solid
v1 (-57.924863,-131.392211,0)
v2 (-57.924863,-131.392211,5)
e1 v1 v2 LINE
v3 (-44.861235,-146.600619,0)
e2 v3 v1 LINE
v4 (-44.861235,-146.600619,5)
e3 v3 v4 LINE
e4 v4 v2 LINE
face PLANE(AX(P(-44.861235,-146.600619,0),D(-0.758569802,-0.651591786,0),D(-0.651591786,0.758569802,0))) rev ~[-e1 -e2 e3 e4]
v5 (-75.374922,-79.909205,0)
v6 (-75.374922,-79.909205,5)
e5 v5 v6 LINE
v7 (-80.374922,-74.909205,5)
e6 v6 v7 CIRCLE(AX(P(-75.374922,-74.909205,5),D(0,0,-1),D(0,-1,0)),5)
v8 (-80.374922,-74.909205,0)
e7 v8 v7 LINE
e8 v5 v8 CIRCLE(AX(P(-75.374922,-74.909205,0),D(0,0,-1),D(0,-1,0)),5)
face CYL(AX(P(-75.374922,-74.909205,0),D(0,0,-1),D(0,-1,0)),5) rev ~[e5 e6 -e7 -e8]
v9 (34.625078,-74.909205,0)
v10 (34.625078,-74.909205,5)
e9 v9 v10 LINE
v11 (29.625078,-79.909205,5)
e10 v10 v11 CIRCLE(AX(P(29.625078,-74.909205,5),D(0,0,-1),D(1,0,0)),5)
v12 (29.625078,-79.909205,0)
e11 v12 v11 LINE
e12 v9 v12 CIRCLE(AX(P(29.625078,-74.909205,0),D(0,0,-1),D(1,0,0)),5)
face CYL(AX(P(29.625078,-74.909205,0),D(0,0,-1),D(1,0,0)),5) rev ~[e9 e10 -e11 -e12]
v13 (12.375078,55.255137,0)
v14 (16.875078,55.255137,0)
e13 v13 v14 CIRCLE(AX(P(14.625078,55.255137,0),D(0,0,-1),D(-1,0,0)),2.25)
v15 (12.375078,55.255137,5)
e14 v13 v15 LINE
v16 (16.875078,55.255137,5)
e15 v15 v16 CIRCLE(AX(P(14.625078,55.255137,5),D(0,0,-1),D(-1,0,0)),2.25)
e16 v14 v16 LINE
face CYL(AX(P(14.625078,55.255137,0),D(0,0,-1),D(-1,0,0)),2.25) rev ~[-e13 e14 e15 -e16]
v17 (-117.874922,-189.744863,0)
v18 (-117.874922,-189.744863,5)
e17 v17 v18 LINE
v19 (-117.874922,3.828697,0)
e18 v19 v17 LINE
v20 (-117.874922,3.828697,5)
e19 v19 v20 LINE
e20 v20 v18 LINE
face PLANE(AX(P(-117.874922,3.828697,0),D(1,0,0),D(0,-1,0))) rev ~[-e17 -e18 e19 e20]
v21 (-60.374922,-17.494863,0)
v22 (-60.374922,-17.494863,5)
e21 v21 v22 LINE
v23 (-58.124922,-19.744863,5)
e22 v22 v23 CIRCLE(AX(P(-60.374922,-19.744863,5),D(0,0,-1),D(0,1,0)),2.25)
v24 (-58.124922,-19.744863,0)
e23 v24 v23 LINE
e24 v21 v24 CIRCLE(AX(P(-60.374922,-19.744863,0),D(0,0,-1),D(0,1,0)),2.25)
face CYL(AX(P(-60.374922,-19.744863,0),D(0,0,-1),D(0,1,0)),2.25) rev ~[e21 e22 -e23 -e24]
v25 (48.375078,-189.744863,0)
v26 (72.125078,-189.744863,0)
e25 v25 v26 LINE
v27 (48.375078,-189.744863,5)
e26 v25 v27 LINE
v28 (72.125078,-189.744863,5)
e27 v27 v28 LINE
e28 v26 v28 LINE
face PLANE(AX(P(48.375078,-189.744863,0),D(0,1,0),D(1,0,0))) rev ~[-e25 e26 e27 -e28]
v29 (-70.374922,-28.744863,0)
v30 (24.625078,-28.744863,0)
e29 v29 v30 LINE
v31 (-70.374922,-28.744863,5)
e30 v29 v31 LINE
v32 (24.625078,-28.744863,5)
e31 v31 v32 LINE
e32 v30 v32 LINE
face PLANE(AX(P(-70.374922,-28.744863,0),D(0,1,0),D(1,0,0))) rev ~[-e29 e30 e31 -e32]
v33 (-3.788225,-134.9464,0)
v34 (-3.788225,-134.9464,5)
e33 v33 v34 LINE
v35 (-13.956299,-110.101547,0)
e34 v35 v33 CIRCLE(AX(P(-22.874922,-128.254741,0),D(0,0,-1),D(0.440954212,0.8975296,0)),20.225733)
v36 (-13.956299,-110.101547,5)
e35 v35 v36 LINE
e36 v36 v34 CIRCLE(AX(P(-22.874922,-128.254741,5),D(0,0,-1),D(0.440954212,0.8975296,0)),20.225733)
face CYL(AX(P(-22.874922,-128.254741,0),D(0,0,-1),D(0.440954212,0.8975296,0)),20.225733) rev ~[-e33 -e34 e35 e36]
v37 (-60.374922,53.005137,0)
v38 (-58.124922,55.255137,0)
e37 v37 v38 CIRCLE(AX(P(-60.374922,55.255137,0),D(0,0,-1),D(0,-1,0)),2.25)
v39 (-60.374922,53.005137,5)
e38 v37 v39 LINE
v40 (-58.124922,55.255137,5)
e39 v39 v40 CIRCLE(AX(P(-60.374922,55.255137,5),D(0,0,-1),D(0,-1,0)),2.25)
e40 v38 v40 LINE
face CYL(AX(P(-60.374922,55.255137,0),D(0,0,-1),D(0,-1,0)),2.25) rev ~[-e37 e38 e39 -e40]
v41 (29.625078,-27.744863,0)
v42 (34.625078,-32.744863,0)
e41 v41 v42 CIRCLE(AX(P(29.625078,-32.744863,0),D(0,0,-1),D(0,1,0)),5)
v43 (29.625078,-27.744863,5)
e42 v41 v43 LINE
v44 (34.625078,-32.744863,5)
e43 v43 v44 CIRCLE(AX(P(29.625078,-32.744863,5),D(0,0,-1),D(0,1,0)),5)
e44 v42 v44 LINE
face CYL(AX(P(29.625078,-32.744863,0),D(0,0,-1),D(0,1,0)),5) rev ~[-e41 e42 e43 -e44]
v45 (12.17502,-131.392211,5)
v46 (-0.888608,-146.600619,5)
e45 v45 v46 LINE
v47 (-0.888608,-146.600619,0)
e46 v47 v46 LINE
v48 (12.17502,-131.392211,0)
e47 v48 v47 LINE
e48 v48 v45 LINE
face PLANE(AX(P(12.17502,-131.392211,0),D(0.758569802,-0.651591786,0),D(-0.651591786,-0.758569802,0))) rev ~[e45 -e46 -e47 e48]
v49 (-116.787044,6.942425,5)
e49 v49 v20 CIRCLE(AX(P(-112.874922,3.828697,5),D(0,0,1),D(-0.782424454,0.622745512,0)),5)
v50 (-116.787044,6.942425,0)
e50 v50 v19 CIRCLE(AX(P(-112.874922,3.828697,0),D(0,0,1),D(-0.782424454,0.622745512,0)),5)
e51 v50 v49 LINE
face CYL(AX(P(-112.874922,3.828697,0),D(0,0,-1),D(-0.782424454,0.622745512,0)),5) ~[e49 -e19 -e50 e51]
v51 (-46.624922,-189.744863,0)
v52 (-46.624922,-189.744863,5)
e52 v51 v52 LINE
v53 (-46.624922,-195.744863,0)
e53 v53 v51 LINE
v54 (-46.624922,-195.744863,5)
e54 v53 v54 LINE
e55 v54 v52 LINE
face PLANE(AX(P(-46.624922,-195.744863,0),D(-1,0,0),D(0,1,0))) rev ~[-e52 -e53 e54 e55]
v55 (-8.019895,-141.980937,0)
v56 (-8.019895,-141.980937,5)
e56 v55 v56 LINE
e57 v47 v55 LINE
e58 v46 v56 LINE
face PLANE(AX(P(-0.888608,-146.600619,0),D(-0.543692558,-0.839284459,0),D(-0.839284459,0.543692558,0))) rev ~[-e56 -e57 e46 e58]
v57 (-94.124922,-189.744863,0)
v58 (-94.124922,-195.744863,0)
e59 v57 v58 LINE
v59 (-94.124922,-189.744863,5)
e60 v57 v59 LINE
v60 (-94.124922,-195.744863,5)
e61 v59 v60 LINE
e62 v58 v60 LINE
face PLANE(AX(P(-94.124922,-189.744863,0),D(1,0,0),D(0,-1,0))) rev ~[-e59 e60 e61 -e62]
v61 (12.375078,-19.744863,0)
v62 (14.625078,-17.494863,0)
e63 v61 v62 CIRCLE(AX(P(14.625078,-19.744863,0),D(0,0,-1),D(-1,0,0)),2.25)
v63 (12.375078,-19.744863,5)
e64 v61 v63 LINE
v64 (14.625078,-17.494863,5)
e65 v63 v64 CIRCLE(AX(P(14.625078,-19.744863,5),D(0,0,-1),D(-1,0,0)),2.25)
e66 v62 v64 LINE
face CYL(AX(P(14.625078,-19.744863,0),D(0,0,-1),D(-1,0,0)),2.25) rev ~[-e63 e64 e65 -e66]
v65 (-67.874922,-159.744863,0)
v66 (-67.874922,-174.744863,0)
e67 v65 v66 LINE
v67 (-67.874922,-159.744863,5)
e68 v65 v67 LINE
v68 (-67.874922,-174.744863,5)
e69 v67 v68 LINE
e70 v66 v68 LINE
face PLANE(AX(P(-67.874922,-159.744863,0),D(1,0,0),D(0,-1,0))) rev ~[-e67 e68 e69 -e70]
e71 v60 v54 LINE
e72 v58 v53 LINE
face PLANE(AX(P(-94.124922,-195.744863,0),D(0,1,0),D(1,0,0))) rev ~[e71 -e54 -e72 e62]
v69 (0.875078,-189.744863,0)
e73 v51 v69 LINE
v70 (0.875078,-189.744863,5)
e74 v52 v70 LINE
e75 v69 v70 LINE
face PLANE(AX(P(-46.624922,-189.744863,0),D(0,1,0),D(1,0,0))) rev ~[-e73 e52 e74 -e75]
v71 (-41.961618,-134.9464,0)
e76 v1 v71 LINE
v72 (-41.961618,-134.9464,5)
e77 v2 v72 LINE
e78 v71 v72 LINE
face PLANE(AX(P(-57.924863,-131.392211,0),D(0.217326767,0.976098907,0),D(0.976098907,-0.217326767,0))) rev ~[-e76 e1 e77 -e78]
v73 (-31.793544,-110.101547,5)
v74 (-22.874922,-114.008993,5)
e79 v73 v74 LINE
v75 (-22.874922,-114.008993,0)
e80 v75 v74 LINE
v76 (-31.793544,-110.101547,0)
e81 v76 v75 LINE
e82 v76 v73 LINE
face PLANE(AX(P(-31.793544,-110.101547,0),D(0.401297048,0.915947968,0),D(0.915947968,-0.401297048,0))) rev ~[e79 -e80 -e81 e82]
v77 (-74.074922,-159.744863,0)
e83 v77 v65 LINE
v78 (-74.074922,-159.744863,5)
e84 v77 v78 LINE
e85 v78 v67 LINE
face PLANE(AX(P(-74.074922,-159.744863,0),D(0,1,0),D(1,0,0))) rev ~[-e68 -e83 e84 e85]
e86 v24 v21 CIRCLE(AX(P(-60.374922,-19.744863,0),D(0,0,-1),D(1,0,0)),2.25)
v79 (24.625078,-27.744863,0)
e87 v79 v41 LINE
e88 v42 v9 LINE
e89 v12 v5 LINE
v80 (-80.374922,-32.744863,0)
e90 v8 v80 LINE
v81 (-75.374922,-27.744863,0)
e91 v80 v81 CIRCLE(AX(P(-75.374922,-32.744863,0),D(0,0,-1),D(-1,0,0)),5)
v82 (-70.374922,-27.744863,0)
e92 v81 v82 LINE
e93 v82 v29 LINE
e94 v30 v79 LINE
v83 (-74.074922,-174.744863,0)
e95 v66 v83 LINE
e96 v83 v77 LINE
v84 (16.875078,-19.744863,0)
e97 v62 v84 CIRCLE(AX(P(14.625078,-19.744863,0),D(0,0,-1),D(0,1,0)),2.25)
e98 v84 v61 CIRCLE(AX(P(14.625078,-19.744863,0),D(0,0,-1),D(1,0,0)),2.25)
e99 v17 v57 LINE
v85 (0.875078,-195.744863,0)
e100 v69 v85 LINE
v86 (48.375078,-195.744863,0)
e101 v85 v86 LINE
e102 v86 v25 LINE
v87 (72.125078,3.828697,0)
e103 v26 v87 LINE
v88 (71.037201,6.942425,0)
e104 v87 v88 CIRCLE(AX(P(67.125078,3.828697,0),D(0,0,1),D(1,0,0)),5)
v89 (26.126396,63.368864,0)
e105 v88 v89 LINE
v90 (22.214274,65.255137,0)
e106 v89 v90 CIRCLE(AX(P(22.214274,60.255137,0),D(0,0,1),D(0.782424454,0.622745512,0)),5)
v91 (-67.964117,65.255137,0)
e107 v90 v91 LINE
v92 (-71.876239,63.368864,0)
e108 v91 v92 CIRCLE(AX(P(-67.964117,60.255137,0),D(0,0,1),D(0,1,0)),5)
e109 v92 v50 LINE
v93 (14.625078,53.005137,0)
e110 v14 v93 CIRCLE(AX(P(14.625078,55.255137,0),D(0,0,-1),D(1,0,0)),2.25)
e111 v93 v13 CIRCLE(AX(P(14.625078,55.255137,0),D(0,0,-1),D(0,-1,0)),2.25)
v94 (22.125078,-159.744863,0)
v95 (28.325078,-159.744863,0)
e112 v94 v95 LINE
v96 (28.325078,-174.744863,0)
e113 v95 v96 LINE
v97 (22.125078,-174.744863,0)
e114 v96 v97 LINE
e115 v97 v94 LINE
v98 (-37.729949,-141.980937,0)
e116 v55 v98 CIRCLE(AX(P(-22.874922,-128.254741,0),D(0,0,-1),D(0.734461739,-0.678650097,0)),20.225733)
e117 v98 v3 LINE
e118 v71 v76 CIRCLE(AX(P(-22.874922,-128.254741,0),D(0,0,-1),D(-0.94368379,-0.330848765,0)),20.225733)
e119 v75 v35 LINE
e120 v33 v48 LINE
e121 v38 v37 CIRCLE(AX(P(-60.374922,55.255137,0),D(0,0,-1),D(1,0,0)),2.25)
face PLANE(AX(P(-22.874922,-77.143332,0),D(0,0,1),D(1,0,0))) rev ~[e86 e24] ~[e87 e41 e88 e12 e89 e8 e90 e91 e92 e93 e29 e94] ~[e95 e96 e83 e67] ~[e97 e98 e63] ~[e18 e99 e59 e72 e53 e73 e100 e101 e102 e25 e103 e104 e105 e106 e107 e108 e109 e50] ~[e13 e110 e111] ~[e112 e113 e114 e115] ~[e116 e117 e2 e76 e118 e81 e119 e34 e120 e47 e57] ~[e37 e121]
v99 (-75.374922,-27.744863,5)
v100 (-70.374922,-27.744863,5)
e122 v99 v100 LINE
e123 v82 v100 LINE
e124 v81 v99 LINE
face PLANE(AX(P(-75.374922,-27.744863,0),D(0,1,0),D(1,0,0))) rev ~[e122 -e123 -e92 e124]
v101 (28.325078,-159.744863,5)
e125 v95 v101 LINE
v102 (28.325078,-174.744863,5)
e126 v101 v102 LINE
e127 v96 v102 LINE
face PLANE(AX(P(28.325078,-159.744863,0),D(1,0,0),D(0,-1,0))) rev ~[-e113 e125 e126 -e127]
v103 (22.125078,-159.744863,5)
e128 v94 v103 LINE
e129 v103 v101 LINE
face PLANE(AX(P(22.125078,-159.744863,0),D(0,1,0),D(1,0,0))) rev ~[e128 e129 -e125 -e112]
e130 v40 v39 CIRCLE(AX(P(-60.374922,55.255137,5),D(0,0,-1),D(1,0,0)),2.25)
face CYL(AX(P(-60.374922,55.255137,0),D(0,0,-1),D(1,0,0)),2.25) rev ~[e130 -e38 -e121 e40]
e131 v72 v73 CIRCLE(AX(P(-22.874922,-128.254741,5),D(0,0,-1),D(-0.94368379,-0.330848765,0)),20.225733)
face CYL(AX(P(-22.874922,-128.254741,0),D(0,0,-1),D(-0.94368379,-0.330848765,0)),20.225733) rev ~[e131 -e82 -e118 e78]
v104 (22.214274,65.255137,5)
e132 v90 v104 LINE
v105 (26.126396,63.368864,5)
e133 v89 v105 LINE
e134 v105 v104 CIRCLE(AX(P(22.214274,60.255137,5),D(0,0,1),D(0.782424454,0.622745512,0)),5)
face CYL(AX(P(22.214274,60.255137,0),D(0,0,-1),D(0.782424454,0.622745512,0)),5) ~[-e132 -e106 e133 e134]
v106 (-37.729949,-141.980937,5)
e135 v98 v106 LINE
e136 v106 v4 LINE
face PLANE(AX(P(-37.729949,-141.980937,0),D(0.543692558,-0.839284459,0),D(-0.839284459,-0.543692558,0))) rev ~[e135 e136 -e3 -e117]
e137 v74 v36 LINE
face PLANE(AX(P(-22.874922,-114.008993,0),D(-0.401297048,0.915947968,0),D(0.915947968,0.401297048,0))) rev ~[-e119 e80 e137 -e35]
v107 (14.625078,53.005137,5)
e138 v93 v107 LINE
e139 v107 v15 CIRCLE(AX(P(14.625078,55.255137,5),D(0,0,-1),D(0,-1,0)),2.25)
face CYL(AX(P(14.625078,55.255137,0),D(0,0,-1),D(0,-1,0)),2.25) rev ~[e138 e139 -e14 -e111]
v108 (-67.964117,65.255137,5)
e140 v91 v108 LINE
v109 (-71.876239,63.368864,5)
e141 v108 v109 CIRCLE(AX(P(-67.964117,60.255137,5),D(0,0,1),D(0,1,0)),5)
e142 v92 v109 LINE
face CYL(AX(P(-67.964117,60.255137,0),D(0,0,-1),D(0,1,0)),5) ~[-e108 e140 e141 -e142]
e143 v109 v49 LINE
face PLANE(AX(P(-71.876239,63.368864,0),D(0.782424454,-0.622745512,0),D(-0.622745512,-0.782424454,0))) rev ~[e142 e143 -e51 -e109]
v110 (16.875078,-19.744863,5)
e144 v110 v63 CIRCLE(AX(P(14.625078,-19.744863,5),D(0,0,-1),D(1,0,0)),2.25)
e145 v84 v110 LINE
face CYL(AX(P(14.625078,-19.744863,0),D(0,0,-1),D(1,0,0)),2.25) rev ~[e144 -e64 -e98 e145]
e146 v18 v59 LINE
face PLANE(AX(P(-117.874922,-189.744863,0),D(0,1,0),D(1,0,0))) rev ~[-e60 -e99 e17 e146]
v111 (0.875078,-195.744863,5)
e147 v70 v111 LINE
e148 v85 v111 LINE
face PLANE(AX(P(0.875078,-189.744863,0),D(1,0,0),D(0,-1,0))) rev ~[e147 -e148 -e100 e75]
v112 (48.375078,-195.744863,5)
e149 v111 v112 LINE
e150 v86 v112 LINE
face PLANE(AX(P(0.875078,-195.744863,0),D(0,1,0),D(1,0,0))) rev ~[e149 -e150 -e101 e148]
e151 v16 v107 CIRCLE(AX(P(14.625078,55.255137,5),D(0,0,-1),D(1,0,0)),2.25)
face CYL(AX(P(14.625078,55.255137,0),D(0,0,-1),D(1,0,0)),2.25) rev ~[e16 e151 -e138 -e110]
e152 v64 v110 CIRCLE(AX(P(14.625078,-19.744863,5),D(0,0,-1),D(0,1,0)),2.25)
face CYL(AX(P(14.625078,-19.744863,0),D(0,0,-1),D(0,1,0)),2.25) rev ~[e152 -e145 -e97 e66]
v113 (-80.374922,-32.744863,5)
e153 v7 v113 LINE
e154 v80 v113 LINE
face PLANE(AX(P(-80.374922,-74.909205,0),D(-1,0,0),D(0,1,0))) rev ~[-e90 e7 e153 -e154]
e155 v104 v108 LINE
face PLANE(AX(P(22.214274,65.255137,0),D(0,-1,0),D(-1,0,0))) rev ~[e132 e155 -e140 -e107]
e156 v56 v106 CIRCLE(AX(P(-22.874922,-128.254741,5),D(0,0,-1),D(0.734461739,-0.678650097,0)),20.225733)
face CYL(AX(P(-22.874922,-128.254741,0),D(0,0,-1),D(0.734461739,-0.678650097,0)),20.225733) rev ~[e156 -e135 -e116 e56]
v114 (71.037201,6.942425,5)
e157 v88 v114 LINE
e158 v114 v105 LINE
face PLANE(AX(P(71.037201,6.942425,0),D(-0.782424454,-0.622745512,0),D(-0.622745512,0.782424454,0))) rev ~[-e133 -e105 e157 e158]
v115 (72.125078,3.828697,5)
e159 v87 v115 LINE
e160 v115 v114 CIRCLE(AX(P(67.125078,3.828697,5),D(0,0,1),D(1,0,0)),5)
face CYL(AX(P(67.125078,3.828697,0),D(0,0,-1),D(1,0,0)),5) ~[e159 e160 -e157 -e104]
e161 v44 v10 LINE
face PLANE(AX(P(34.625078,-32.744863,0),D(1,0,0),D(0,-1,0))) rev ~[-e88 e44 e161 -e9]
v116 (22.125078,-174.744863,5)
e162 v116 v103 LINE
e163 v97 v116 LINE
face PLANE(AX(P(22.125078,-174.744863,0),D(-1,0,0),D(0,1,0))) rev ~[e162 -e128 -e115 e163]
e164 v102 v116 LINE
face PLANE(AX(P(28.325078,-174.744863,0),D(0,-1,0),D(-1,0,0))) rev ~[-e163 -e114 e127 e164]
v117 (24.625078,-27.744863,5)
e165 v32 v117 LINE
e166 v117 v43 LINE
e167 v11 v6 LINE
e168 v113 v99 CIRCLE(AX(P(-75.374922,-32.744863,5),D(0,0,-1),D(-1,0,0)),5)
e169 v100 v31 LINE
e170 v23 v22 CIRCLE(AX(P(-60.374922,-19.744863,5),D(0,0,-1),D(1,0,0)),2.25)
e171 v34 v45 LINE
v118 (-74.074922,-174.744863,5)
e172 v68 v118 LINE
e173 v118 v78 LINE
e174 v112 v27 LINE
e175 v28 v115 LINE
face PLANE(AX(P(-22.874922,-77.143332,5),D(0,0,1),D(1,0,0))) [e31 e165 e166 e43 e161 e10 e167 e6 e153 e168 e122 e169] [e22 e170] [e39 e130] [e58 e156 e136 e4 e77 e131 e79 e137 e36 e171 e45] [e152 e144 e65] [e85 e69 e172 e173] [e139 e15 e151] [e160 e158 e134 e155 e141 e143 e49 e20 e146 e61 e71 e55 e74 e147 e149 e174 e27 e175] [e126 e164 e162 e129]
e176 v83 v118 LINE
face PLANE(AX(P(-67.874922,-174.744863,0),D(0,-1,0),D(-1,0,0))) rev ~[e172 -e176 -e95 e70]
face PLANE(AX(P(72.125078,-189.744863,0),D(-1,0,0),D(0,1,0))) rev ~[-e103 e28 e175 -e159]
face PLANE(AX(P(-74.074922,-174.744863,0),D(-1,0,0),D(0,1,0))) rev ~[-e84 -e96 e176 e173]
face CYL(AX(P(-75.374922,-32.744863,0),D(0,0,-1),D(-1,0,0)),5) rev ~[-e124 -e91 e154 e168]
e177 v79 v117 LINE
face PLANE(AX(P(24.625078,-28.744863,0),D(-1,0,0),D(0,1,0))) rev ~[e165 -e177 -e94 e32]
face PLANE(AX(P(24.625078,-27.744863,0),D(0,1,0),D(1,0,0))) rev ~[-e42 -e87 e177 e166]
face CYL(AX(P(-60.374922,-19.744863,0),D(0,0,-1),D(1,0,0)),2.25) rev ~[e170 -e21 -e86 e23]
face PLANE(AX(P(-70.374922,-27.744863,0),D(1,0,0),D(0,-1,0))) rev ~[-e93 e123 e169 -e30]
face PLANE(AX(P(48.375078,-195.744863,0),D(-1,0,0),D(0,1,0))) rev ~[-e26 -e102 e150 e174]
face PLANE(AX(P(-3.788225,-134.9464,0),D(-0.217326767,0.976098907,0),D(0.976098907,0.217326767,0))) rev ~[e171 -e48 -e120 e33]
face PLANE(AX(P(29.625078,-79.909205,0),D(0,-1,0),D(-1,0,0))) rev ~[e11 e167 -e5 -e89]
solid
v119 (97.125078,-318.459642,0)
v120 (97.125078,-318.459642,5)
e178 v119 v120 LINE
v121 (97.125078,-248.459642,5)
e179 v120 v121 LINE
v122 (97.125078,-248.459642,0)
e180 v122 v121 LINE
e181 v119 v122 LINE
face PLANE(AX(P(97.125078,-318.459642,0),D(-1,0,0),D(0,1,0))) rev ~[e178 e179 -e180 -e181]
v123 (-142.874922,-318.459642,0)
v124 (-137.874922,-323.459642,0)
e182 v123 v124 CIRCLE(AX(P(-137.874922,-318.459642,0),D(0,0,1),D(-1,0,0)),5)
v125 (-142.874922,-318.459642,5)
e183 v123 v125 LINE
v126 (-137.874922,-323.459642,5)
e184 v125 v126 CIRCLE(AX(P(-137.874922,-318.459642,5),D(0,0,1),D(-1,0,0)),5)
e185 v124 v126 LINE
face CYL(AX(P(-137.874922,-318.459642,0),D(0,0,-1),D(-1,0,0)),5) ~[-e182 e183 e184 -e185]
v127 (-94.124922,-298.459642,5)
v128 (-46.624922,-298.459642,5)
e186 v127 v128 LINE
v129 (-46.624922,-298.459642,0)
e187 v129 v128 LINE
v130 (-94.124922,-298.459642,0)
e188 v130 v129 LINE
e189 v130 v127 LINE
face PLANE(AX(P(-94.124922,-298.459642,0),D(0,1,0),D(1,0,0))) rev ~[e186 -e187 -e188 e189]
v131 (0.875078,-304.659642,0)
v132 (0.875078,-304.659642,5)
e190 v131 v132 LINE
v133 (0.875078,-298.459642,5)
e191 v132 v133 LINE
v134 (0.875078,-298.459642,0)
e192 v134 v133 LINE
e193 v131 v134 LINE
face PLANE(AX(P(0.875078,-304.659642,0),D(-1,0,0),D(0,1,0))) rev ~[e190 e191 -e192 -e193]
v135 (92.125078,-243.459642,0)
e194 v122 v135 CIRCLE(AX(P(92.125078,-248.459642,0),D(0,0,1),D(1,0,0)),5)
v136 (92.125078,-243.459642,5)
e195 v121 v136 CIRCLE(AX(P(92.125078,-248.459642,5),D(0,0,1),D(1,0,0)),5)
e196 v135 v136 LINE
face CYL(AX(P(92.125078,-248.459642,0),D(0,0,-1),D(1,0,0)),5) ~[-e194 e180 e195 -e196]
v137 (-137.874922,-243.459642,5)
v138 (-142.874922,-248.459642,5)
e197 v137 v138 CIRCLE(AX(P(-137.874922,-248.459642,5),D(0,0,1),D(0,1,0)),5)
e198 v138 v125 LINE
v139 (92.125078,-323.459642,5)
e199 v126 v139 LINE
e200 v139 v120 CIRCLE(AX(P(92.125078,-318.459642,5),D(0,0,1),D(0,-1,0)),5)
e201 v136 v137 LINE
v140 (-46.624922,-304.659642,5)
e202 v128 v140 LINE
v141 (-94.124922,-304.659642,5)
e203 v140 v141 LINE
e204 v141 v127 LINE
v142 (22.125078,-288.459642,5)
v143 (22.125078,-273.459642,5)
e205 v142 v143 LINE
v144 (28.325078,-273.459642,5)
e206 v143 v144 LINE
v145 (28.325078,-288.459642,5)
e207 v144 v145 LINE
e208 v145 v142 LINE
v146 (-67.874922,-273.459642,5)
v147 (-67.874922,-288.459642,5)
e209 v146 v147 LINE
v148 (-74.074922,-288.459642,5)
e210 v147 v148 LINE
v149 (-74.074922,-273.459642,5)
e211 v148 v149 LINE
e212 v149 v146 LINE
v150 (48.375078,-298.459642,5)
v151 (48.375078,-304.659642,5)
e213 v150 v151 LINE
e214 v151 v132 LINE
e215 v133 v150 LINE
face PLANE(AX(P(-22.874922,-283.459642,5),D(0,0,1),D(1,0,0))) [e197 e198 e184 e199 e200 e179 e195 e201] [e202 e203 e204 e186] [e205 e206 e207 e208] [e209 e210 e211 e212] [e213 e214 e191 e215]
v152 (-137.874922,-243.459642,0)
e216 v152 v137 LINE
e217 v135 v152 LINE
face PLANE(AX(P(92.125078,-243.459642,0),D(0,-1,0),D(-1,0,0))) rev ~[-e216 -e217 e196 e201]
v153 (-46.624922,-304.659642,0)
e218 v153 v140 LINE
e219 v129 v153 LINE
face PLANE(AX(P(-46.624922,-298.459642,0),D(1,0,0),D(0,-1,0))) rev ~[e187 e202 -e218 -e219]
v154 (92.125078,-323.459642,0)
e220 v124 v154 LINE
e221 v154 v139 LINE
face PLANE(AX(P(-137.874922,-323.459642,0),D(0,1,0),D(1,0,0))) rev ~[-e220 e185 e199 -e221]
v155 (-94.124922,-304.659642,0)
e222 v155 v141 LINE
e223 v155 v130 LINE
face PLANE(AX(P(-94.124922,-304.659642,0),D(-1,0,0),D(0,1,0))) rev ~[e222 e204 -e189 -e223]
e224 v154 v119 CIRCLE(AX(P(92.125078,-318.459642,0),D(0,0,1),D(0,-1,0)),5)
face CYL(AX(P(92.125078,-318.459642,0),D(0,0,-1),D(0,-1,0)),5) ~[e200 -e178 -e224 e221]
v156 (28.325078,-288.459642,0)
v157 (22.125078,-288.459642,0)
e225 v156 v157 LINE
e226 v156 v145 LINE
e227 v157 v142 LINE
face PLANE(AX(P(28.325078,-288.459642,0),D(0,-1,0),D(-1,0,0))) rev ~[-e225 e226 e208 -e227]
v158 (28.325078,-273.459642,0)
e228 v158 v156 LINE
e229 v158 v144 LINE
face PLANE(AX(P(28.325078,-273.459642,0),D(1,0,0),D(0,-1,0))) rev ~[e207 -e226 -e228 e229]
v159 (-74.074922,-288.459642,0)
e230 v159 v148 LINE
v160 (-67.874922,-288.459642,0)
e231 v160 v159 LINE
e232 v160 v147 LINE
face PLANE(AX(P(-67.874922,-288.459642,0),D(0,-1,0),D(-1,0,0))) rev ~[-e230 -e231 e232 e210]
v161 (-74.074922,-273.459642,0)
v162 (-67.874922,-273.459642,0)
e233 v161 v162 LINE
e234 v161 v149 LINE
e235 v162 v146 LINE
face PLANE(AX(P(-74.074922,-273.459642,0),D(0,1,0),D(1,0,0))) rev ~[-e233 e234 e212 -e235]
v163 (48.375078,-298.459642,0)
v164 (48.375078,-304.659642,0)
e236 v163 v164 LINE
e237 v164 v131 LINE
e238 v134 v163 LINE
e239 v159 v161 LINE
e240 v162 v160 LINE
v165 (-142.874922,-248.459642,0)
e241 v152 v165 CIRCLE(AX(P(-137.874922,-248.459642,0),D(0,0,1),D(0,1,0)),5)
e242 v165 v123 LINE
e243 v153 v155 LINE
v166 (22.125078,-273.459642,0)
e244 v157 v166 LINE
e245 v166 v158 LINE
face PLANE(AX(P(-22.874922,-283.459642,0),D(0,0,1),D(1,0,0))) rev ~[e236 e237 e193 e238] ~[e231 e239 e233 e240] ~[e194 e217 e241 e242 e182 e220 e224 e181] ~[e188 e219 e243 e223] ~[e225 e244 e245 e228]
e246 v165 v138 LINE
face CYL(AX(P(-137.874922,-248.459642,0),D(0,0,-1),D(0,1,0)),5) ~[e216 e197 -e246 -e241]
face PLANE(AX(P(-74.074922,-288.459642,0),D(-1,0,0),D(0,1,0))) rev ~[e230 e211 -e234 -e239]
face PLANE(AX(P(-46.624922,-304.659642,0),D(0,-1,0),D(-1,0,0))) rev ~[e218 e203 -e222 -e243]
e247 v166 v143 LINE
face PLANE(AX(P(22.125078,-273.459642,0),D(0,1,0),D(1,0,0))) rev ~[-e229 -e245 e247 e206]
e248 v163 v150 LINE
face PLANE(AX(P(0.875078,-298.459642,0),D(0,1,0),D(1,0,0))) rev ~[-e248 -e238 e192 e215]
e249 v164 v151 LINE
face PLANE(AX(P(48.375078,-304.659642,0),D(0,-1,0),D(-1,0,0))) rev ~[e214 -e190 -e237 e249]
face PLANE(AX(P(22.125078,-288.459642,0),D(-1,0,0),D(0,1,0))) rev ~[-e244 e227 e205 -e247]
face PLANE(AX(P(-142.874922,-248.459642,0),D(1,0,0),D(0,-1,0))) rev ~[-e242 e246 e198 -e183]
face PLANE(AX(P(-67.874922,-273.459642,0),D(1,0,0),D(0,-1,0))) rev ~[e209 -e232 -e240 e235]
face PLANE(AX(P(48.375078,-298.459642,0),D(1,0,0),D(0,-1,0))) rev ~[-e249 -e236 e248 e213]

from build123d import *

# Parameters (mm, degrees)
F1_DEPTH = 5


with BuildPart() as f1:
    # F0 (on Top) → F1 (new body)
    with BuildSketch(Plane.XY):
        with BuildLine():
            Line((92.1250784397, -243.4596419334), (-22.8749215603, -243.4596419334))
            Line((-22.8749215603, -243.4596419334), (-137.8749215603, -243.4596419334))
            ThreePointArc((-137.8749215603, -243.4596419334), (-141.4104554662, -244.9241080275), (-142.8749215603, -248.4596419334))
            Line((-142.8749215603, -248.4596419334), (-142.8749215603, -283.4596419334))
            Line((-142.8749215603, -283.4596419334), (-142.8749215603, -298.4596419334))
            Line((-142.8749215603, -298.4596419334), (-142.8749215603, -318.4596419334))
            ThreePointArc((-142.8749215603, -318.4596419334), (-141.4104554662, -321.9951758394), (-137.8749215603, -323.4596419334))
            Line((-137.8749215603, -323.4596419334), (92.1250784397, -323.4596419334))
            ThreePointArc((92.1250784397, -323.4596419334), (95.6606123456, -321.9951758394), (97.1250784397, -318.4596419334))
            Line((97.1250784397, -318.4596419334), (97.1250784397, -248.4596419334))
            ThreePointArc((97.1250784397, -248.4596419334), (95.6606123456, -244.9241080275), (92.1250784397, -243.4596419334))
        make_face()
        Polygon((-94.1249215603, -303.4596419334), (-94.1249215603, -298.4596419334), (-46.6249215603, -298.4596419334), (-46.6249215603, -303.4596419334), (-46.6249215603, -304.6596419334), (-94.1249215603, -304.6596419334), align=None, mode=Mode.SUBTRACT)
        Polygon((-72.8749215603, -273.4596419334), (-70.3749215603, -273.4596419334), (-67.8749215603, -273.4596419334), (-67.8749215603, -288.4596419334), (-72.8749215603, -288.4596419334), (-74.0749215603, -288.4596419334), (-74.0749215603, -273.4596419334), align=None, mode=Mode.SUBTRACT)
        Polygon((0.8750784397, -304.6596419334), (0.8750784397, -303.4596419334), (0.8750784397, -298.4596419334), (48.3750784397, -298.4596419334), (48.3750784397, -303.4596419334), (48.3750784397, -304.6596419334), align=None, mode=Mode.SUBTRACT)
        Polygon((22.1250784397, -273.4596419334), (24.6250784397, -273.4596419334), (27.1250784397, -273.4596419334), (28.3250784397, -273.4596419334), (28.3250784397, -288.4596419334), (27.1250784397, -288.4596419334), (22.1250784397, -288.4596419334), align=None, mode=Mode.SUBTRACT)
    extrude(amount=F1_DEPTH)


with BuildPart() as f1b:
    # F0 (on Top) → F1, piece 2 (new body)
    with BuildSketch(Plane.XY):
        with BuildLine():
            Line((14.6250784397, 65.2551365197), (-60.3749215603, 65.2551365197))
            Line((-60.3749215603, 65.2551365197), (-67.9641170056, 65.2551365197))
            ThreePointArc((-67.9641170056, 65.2551365197), (-70.135678908, 64.758948117), (-71.8762392778, 63.3688640813))
            Line((-71.8762392778, 63.3688640813), (-116.7870438325, 6.9424249383))
            ThreePointArc((-116.7870438325, 6.9424249383), (-117.5951234289, 5.4778469514), (-117.8749215603, 3.8286973767))
            Line((-117.8749215603, 3.8286973767), (-117.8749215603, -52.7448634803))
            Line((-117.8749215603, -52.7448634803), (-117.8749215603, -189.7448634803))
            Line((-117.8749215603, -189.7448634803), (-94.1249215603, -189.7448634803))
            Line((-94.1249215603, -189.7448634803), (-94.1249215603, -194.7448634803))
            Line((-94.1249215603, -194.7448634803), (-94.1249215603, -195.7448634803))
            Line((-94.1249215603, -195.7448634803), (-46.6249215603, -195.7448634803))
            Line((-46.6249215603, -195.7448634803), (-46.6249215603, -194.7448634803))
            Line((-46.6249215603, -194.7448634803), (-46.6249215603, -189.7448634803))
            Line((-46.6249215603, -189.7448634803), (-22.8749215603, -189.7448634803))
            Line((-22.8749215603, -189.7448634803), (0.8750784397, -189.7448634803))
            Line((0.8750784397, -189.7448634803), (0.8750784397, -194.7448634803))
            Line((0.8750784397, -194.7448634803), (0.8750784397, -195.7448634803))
            Line((0.8750784397, -195.7448634803), (48.3750784397, -195.7448634803))
            Line((48.3750784397, -195.7448634803), (48.3750784397, -194.7448634803))
            Line((48.3750784397, -194.7448634803), (48.3750784397, -189.7448634803))
            Line((48.3750784397, -189.7448634803), (72.1250784397, -189.7448634803))
            Line((72.1250784397, -189.7448634803), (72.1250784397, -52.7448634803))
            Line((72.1250784397, -52.7448634803), (72.1250784397, 3.8286973767))
            ThreePointArc((72.1250784397, 3.8286973767), (71.8452803083, 5.4778469514), (71.0372007119, 6.9424249383))
            Line((71.0372007119, 6.9424249383), (26.1263961572, 63.3688640813))
            ThreePointArc((26.1263961572, 63.3688640813), (24.3858357875, 64.758948117), (22.214273885, 65.2551365197))
            Line((22.214273885, 65.2551365197), (14.6250784397, 65.2551365197))
        make_face()
        Polygon((-72.8749215603, -159.7448634803), (-70.3749215603, -159.7448634803), (-67.8749215603, -159.7448634803), (-67.8749215603, -174.7448634803), (-72.8749215603, -174.7448634803), (-74.0749215603, -174.7448634803), (-74.0749215603, -159.7448634803), align=None, mode=Mode.SUBTRACT)
        Polygon((22.1250784397, -159.7448634803), (24.6250784397, -159.7448634803), (27.1250784397, -159.7448634803), (28.3250784397, -159.7448634803), (28.3250784397, -174.7448634803), (27.1250784397, -174.7448634803), (22.1250784397, -174.7448634803), align=None, mode=Mode.SUBTRACT)
        with BuildLine():
            ThreePointArc((-41.9616178547, -134.9464001798), (-41.5936592763, -120.5938582844), (-31.7935436802, -110.1015474486))
            Line((-31.7935436802, -110.1015474486), (-22.8749215603, -114.0089929104))
            Line((-22.8749215603, -114.0089929104), (-13.9562994404, -110.1015474486))
            ThreePointArc((-13.9562994404, -110.1015474486), (-4.1561838443, -120.5938582844), (-3.7882252659, -134.9464001798))
            Line((-3.7882252659, -134.9464001798), (12.1750198305, -131.392210722))
            Line((12.1750198305, -131.392210722), (-0.8886083961, -146.6006189585))
            Line((-0.8886083961, -146.6006189585), (-8.0198945936, -141.9809370457))
            ThreePointArc((-8.0198945936, -141.9809370457), (-22.8749215603, -148.4804743528), (-37.729948527, -141.9809370457))
            Line((-37.729948527, -141.9809370457), (-44.8612347245, -146.6006189585))
            Line((-44.8612347245, -146.6006189585), (-57.924862951, -131.392210722))
            Line((-57.924862951, -131.392210722), (-41.9616178547, -134.9464001798))
        make_face(mode=Mode.SUBTRACT)
        with BuildLine():
            ThreePointArc((-60.3749215603, -17.4948634803), (-58.7839313026, -18.1538732226), (-58.1249215603, -19.7448634803))
            ThreePointArc((-58.1249215603, -19.7448634803), (-61.965911818, -21.3358537379), (-60.3749215603, -17.4948634803))
        make_face(mode=Mode.SUBTRACT)
        with BuildLine():
            ThreePointArc((-60.3749215603, 53.0051365197), (-61.965911818, 56.8461267774), (-58.1249215603, 55.2551365197))
            ThreePointArc((-58.1249215603, 55.2551365197), (-58.7839313026, 53.6641462621), (-60.3749215603, 53.0051365197))
        make_face(mode=Mode.SUBTRACT)
        with BuildLine():
            Line((-80.3749215603, -74.9092054367), (-80.3749215603, -52.7448634803))
            Line((-80.3749215603, -52.7448634803), (-80.3749215603, -32.7448634803))
            ThreePointArc((-80.3749215603, -32.7448634803), (-78.9104554662, -29.2093295743), (-75.3749215603, -27.7448634803))
            Line((-75.3749215603, -27.7448634803), (-70.3749215603, -27.7448634803))
            Line((-70.3749215603, -27.7448634803), (-70.3749215603, -28.7448634803))
            Line((-70.3749215603, -28.7448634803), (24.6250784397, -28.7448634803))
            Line((24.6250784397, -28.7448634803), (24.6250784397, -27.7448634803))
            Line((24.6250784397, -27.7448634803), (29.6250784397, -27.7448634803))
            ThreePointArc((29.6250784397, -27.7448634803), (33.1606123456, -29.2093295743), (34.6250784397, -32.7448634803))
            Line((34.6250784397, -32.7448634803), (34.6250784397, -74.9092054367))
            ThreePointArc((34.6250784397, -74.9092054367), (33.1606123456, -78.4447393426), (29.6250784397, -79.9092054367))
            Line((29.6250784397, -79.9092054367), (-75.3749215603, -79.9092054367))
            ThreePointArc((-75.3749215603, -79.9092054367), (-78.9104554662, -78.4447393426), (-80.3749215603, -74.9092054367))
        make_face(mode=Mode.SUBTRACT)
        with BuildLine():
            ThreePointArc((14.6250784397, -17.4948634803), (16.2160686974, -18.1538732226), (16.8750784397, -19.7448634803))
            ThreePointArc((16.8750784397, -19.7448634803), (14.6250784397, -21.9948634803), (12.3750784397, -19.7448634803))
            ThreePointArc((12.3750784397, -19.7448634803), (13.034088182, -18.1538732226), (14.6250784397, -17.4948634803))
        make_face(mode=Mode.SUBTRACT)
        with BuildLine():
            ThreePointArc((16.8750784397, 55.2551365197), (16.2160686974, 53.6641462621), (14.6250784397, 53.0051365197))
            ThreePointArc((14.6250784397, 53.0051365197), (13.034088182, 53.6641462621), (12.3750784397, 55.2551365197))
            ThreePointArc((12.3750784397, 55.2551365197), (14.6250784397, 57.5051365197), (16.8750784397, 55.2551365197))
        make_face(mode=Mode.SUBTRACT)
    extrude(amount=F1_DEPTH)


solid = Compound([f1.part, f1b.part])
